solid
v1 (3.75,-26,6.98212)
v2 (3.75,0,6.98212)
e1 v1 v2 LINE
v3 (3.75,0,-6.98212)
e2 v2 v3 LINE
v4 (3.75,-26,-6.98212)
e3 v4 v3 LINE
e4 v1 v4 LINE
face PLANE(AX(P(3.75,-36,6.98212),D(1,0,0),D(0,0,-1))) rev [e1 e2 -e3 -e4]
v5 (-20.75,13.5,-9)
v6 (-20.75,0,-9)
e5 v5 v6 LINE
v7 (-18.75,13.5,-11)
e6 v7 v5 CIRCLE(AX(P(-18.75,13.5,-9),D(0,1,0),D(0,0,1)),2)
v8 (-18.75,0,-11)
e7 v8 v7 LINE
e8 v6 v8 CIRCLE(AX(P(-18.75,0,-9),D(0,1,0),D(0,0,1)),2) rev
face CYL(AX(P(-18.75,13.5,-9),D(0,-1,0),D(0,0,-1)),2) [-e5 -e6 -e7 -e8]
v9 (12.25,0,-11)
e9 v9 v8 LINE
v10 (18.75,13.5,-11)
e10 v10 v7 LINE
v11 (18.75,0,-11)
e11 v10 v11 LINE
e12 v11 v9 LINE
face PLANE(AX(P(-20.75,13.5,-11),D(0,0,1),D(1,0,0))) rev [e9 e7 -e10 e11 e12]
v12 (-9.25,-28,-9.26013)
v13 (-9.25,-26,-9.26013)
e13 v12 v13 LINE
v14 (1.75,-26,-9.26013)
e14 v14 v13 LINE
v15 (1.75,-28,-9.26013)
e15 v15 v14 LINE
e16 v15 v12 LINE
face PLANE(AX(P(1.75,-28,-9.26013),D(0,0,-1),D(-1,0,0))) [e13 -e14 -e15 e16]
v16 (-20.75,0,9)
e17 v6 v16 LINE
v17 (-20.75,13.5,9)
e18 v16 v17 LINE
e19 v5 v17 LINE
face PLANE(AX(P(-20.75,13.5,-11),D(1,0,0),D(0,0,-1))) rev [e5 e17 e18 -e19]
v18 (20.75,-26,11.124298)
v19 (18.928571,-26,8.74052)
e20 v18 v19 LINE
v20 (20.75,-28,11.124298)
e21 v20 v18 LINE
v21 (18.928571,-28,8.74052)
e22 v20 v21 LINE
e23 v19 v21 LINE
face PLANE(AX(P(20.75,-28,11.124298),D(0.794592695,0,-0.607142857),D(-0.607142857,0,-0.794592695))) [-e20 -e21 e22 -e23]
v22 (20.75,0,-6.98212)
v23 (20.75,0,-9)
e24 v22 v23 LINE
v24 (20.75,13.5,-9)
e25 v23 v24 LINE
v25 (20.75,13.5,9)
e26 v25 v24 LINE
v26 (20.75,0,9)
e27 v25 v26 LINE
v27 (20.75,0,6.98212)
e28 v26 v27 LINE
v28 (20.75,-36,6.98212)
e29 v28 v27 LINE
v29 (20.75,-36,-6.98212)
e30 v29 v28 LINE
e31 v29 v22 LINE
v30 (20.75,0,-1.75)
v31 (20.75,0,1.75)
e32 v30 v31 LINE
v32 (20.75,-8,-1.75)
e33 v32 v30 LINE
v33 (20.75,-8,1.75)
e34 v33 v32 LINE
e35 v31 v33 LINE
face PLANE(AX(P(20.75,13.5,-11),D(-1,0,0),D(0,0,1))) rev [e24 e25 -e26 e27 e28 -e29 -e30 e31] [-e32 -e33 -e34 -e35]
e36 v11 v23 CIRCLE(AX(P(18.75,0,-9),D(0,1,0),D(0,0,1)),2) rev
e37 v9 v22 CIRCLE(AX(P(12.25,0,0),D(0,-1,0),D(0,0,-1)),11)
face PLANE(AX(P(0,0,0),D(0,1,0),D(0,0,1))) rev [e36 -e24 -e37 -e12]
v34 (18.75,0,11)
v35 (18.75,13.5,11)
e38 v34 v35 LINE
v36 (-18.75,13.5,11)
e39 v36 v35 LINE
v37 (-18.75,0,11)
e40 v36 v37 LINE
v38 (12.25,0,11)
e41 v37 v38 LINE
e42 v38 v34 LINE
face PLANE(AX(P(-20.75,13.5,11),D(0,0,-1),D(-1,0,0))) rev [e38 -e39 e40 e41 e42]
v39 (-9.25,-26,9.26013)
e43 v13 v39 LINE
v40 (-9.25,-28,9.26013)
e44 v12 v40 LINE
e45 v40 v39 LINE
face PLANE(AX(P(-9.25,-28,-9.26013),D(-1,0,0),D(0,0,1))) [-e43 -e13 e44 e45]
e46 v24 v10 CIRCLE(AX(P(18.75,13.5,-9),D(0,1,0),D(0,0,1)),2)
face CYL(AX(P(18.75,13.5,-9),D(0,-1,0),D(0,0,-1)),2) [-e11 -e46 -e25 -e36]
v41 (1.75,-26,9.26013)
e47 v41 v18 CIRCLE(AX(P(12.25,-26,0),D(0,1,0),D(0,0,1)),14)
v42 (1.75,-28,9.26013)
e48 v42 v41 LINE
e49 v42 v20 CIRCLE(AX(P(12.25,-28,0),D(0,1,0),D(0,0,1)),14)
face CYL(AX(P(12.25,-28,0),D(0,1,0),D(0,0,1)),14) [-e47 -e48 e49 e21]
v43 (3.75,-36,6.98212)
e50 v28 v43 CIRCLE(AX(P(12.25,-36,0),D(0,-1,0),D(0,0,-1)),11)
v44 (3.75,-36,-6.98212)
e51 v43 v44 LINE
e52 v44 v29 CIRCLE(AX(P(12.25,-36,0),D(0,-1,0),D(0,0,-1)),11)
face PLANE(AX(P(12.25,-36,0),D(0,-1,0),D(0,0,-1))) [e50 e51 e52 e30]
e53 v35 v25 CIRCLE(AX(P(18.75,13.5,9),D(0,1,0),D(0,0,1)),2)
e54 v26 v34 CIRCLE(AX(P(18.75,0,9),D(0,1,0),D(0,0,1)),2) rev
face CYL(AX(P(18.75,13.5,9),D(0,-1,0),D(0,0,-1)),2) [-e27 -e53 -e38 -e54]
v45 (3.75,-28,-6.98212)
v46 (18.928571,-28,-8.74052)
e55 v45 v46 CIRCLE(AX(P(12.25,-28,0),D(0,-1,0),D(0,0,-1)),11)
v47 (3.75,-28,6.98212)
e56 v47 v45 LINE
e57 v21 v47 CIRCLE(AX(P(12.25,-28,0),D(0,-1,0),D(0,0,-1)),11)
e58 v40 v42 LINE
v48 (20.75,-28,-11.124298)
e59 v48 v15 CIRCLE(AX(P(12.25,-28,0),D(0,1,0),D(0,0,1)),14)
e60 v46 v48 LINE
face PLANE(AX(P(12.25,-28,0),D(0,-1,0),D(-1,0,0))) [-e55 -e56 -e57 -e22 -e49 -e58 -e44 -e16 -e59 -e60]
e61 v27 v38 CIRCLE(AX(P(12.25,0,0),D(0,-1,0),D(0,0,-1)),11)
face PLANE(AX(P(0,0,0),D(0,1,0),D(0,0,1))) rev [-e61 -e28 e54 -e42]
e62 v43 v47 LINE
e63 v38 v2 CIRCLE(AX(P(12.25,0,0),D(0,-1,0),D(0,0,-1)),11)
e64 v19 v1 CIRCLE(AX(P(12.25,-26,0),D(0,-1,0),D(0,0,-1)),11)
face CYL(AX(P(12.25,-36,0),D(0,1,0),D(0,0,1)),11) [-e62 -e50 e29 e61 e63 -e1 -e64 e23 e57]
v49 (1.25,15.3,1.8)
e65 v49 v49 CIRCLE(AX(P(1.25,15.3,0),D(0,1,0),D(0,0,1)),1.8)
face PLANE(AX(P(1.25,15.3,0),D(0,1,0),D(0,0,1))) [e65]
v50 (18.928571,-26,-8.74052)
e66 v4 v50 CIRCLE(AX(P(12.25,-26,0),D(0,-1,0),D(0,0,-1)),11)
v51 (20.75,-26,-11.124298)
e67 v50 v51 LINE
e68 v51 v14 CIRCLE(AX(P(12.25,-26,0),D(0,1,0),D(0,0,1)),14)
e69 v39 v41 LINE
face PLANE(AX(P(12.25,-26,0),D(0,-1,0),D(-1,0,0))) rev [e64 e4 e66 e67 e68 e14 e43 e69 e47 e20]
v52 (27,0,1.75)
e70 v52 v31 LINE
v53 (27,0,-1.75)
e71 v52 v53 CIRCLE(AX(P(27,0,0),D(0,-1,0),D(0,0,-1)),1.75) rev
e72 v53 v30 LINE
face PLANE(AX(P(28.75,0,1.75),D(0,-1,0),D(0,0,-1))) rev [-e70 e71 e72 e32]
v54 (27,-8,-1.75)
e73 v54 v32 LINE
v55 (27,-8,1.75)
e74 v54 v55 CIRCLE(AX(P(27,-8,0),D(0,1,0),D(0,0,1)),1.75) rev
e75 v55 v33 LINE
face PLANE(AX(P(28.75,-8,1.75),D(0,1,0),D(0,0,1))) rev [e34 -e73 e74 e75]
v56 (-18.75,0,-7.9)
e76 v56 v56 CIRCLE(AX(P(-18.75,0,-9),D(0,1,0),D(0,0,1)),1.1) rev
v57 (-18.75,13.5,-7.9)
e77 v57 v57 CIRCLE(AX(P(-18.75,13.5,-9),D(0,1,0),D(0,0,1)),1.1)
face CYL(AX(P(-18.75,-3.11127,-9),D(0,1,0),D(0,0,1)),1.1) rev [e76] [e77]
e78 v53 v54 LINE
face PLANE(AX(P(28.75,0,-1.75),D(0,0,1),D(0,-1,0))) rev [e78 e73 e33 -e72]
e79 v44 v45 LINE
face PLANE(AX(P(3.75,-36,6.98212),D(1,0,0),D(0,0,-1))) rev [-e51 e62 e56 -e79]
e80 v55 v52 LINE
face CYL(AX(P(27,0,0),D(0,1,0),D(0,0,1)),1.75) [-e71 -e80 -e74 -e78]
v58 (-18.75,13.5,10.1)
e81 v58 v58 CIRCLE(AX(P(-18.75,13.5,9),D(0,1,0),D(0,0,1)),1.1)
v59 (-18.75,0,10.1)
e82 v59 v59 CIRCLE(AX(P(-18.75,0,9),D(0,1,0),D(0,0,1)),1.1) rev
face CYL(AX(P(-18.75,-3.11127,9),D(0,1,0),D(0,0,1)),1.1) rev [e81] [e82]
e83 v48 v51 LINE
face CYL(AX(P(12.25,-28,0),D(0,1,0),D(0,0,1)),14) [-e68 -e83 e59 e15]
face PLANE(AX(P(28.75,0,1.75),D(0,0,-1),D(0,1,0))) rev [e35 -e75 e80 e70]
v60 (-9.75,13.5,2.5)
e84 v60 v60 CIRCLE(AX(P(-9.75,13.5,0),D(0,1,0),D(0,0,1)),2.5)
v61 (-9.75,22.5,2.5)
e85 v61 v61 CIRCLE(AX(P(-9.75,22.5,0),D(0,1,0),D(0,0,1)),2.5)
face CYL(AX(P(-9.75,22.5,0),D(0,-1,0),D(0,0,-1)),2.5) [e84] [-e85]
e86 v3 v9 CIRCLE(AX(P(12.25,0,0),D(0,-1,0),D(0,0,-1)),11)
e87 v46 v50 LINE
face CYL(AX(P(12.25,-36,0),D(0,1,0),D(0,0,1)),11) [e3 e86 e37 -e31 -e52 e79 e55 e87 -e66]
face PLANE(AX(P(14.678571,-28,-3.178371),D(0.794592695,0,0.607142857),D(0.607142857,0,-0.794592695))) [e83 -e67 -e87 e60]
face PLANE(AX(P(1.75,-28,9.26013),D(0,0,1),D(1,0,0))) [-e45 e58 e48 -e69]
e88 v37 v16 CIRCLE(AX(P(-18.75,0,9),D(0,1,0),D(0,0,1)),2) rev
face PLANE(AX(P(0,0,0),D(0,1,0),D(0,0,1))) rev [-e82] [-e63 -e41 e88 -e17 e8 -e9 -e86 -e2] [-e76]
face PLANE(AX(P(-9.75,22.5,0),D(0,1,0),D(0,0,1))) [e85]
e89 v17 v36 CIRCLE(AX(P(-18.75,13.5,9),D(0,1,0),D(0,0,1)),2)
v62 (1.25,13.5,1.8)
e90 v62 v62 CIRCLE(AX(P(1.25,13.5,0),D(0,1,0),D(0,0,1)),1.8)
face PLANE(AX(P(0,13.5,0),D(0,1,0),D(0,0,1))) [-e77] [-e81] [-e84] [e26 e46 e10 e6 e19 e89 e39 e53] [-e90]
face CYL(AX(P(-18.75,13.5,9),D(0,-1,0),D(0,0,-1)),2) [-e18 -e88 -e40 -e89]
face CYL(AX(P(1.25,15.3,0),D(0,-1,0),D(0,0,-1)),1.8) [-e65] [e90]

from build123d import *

# Parameters (mm, degrees)
SKETCH1_W           = 41.5
SKETCH1_H           = 22
BASE_DEPTH          = 13.5
FILLET1_R           = 2
SKETCH2_R           = 1.1
SCREWHOLE_DEPTH     = 13.5
SKETCH3_R           = 2.5
SPINAXEL_DEPTH      = 9
SKETCH4_R           = 1.8
FITTINGKNOB_DEPTH   = 1.8
BOSS_EXTRUDE4_DEPTH = 36
EXTRUDE_THIN1_DEPTH = 2
SKETCH7_W           = 3.5
SKETCH7_H           = 8
BOSS_EXTRUDE5_DEPTH = 8
FILLET2_RADIUS      = 1.75
FILLET2_LENGTH      = 8


# Read off the part's stored shape, not the designer's step: Extrude-Thin1
with BuildPart() as part:
    # Sketch1 → Base (new body)
    with BuildSketch(Plane(origin=(0, 0, 0), x_dir=(1, 0, 0), z_dir=(0, 1, 0))):
        Rectangle(SKETCH1_W, SKETCH1_H)
    extrude(amount=BASE_DEPTH)

    # Fillet1
    fillet1_edges = [part.edges().sort_by_distance(p)[0] for p in [
        (20.75, 6.75, 11),
        (-20.75, 6.75, 11),
        (-20.75, 6.75, -11),
        (20.75, 6.75, -11),
    ]]
    fillet(fillet1_edges, radius=FILLET1_R)

    # Sketch2 → ScrewHole (cut)
    with BuildSketch(Plane(origin=(0, 13.5, 0), x_dir=(1, 0, 0), z_dir=(0, 1, 0))):
        with Locations(Location((-18.75, 9, 0), (0, 0, 270))):
            Circle(SKETCH2_R)
        with Locations(Location((-18.75, -9, 0), (0, 0, 270))):
            Circle(SKETCH2_R)
    extrude(amount=-SCREWHOLE_DEPTH, mode=Mode.SUBTRACT)

    # Sketch3 → SpinAxel (add)
    with BuildSketch(Plane(origin=(0, 13.5, 0), x_dir=(1, 0, 0), z_dir=(0, 1, 0))):
        with Locations(Location((-9.75, 0, 0), (0, 0, 270))):
            Circle(SKETCH3_R)
    extrude(amount=SPINAXEL_DEPTH)

    # Sketch4 → FittingKnob (add)
    with BuildSketch(Plane(origin=(0, 13.5, 0), x_dir=(1, 0, 0), z_dir=(0, 1, 0))):
        with Locations(Location((1.25, 0, 0), (0, 0, 270))):
            Circle(SKETCH4_R)
    extrude(amount=FITTINGKNOB_DEPTH)

    # Sketch5 → Boss-Extrude4 (add)
    with BuildSketch(Plane(origin=(0, 0, 0), x_dir=(-1, 0, 0), z_dir=(0, -1, 0))):
        with BuildLine():
            Line((-3.75, -6.982120022), (-3.75, 6.982120022))
            ThreePointArc((-3.75, 6.982120022), (-12.25, 11), (-20.75, 6.982120022))
            Line((-20.75, 6.982120022), (-20.75, -6.982120022))
            ThreePointArc((-20.75, -6.982120022), (-12.25, -11), (-3.75, -6.982120022))
        make_face()
    extrude(amount=BOSS_EXTRUDE4_DEPTH)

    # Extrude-Thin1 outline → Extrude-Thin1 (add)
    with BuildSketch(Plane(origin=(0, -26, 0), x_dir=(-1, 0, 0), z_dir=(0, -1, 0))):
        with BuildLine():
            ThreePointArc((-3.75, -6.982120022), (-10.984143444, -10.926921212), (-18.928571429, -8.740519646))
            Line((-18.928571429, -8.740519646), (-20.75, -11.124297731))
            ThreePointArc((-20.75, -11.124297731), (-10.882966454, -13.933097979), (-1.75, -9.260129589))
            Line((-1.75, -9.260129589), (9.25, -9.260129589))
            Line((9.25, -9.260129589), (9.25, 9.260129589))
            Line((9.25, 9.260129589), (-1.75, 9.260129589))
            ThreePointArc((-1.75, 9.260129589), (-10.882966454, 13.933097979), (-20.75, 11.124297731))
            Line((-20.75, 11.124297731), (-18.928571429, 8.740519646))
            ThreePointArc((-18.928571429, 8.740519646), (-10.984143444, 10.926921212), (-3.75, 6.982120022))
            Line((-3.75, 6.982120022), (-3.75, -6.982120022))
        make_face()
    extrude(amount=EXTRUDE_THIN1_DEPTH)

    # Sketch7 → Boss-Extrude5 (add)
    with BuildSketch(Plane(origin=(20.75, 0, 0), x_dir=(0, 0, -1), z_dir=(1, 0, 0))):
        with Locations((0, -4)):
            Rectangle(SKETCH7_W, SKETCH7_H)
    extrude(amount=BOSS_EXTRUDE5_DEPTH)

    # Fillet2: full round fillet: the end face becomes a half cylinder, R = half its width
    fillet2_face = Plane((28.75, -4, 0), x_dir=(0, 1, 0), z_dir=(1, 0, 0))  # on the end face: x along it, z out of the body
    fillet2_slab = fillet2_face.offset(-FILLET2_RADIUS / 2) * Box(FILLET2_LENGTH, 2 * FILLET2_RADIUS, FILLET2_RADIUS, mode=Mode.PRIVATE)  # the body's end, R deep
    fillet2_round = Plane((27, -4, 0), x_dir=(1, 0, 0), z_dir=(0, 1, 0)) * Cylinder(FILLET2_RADIUS, FILLET2_LENGTH, mode=Mode.PRIVATE)  # its axis R under the face
    add(fillet2_slab - fillet2_round, mode=Mode.SUBTRACT)


solid = part.part
